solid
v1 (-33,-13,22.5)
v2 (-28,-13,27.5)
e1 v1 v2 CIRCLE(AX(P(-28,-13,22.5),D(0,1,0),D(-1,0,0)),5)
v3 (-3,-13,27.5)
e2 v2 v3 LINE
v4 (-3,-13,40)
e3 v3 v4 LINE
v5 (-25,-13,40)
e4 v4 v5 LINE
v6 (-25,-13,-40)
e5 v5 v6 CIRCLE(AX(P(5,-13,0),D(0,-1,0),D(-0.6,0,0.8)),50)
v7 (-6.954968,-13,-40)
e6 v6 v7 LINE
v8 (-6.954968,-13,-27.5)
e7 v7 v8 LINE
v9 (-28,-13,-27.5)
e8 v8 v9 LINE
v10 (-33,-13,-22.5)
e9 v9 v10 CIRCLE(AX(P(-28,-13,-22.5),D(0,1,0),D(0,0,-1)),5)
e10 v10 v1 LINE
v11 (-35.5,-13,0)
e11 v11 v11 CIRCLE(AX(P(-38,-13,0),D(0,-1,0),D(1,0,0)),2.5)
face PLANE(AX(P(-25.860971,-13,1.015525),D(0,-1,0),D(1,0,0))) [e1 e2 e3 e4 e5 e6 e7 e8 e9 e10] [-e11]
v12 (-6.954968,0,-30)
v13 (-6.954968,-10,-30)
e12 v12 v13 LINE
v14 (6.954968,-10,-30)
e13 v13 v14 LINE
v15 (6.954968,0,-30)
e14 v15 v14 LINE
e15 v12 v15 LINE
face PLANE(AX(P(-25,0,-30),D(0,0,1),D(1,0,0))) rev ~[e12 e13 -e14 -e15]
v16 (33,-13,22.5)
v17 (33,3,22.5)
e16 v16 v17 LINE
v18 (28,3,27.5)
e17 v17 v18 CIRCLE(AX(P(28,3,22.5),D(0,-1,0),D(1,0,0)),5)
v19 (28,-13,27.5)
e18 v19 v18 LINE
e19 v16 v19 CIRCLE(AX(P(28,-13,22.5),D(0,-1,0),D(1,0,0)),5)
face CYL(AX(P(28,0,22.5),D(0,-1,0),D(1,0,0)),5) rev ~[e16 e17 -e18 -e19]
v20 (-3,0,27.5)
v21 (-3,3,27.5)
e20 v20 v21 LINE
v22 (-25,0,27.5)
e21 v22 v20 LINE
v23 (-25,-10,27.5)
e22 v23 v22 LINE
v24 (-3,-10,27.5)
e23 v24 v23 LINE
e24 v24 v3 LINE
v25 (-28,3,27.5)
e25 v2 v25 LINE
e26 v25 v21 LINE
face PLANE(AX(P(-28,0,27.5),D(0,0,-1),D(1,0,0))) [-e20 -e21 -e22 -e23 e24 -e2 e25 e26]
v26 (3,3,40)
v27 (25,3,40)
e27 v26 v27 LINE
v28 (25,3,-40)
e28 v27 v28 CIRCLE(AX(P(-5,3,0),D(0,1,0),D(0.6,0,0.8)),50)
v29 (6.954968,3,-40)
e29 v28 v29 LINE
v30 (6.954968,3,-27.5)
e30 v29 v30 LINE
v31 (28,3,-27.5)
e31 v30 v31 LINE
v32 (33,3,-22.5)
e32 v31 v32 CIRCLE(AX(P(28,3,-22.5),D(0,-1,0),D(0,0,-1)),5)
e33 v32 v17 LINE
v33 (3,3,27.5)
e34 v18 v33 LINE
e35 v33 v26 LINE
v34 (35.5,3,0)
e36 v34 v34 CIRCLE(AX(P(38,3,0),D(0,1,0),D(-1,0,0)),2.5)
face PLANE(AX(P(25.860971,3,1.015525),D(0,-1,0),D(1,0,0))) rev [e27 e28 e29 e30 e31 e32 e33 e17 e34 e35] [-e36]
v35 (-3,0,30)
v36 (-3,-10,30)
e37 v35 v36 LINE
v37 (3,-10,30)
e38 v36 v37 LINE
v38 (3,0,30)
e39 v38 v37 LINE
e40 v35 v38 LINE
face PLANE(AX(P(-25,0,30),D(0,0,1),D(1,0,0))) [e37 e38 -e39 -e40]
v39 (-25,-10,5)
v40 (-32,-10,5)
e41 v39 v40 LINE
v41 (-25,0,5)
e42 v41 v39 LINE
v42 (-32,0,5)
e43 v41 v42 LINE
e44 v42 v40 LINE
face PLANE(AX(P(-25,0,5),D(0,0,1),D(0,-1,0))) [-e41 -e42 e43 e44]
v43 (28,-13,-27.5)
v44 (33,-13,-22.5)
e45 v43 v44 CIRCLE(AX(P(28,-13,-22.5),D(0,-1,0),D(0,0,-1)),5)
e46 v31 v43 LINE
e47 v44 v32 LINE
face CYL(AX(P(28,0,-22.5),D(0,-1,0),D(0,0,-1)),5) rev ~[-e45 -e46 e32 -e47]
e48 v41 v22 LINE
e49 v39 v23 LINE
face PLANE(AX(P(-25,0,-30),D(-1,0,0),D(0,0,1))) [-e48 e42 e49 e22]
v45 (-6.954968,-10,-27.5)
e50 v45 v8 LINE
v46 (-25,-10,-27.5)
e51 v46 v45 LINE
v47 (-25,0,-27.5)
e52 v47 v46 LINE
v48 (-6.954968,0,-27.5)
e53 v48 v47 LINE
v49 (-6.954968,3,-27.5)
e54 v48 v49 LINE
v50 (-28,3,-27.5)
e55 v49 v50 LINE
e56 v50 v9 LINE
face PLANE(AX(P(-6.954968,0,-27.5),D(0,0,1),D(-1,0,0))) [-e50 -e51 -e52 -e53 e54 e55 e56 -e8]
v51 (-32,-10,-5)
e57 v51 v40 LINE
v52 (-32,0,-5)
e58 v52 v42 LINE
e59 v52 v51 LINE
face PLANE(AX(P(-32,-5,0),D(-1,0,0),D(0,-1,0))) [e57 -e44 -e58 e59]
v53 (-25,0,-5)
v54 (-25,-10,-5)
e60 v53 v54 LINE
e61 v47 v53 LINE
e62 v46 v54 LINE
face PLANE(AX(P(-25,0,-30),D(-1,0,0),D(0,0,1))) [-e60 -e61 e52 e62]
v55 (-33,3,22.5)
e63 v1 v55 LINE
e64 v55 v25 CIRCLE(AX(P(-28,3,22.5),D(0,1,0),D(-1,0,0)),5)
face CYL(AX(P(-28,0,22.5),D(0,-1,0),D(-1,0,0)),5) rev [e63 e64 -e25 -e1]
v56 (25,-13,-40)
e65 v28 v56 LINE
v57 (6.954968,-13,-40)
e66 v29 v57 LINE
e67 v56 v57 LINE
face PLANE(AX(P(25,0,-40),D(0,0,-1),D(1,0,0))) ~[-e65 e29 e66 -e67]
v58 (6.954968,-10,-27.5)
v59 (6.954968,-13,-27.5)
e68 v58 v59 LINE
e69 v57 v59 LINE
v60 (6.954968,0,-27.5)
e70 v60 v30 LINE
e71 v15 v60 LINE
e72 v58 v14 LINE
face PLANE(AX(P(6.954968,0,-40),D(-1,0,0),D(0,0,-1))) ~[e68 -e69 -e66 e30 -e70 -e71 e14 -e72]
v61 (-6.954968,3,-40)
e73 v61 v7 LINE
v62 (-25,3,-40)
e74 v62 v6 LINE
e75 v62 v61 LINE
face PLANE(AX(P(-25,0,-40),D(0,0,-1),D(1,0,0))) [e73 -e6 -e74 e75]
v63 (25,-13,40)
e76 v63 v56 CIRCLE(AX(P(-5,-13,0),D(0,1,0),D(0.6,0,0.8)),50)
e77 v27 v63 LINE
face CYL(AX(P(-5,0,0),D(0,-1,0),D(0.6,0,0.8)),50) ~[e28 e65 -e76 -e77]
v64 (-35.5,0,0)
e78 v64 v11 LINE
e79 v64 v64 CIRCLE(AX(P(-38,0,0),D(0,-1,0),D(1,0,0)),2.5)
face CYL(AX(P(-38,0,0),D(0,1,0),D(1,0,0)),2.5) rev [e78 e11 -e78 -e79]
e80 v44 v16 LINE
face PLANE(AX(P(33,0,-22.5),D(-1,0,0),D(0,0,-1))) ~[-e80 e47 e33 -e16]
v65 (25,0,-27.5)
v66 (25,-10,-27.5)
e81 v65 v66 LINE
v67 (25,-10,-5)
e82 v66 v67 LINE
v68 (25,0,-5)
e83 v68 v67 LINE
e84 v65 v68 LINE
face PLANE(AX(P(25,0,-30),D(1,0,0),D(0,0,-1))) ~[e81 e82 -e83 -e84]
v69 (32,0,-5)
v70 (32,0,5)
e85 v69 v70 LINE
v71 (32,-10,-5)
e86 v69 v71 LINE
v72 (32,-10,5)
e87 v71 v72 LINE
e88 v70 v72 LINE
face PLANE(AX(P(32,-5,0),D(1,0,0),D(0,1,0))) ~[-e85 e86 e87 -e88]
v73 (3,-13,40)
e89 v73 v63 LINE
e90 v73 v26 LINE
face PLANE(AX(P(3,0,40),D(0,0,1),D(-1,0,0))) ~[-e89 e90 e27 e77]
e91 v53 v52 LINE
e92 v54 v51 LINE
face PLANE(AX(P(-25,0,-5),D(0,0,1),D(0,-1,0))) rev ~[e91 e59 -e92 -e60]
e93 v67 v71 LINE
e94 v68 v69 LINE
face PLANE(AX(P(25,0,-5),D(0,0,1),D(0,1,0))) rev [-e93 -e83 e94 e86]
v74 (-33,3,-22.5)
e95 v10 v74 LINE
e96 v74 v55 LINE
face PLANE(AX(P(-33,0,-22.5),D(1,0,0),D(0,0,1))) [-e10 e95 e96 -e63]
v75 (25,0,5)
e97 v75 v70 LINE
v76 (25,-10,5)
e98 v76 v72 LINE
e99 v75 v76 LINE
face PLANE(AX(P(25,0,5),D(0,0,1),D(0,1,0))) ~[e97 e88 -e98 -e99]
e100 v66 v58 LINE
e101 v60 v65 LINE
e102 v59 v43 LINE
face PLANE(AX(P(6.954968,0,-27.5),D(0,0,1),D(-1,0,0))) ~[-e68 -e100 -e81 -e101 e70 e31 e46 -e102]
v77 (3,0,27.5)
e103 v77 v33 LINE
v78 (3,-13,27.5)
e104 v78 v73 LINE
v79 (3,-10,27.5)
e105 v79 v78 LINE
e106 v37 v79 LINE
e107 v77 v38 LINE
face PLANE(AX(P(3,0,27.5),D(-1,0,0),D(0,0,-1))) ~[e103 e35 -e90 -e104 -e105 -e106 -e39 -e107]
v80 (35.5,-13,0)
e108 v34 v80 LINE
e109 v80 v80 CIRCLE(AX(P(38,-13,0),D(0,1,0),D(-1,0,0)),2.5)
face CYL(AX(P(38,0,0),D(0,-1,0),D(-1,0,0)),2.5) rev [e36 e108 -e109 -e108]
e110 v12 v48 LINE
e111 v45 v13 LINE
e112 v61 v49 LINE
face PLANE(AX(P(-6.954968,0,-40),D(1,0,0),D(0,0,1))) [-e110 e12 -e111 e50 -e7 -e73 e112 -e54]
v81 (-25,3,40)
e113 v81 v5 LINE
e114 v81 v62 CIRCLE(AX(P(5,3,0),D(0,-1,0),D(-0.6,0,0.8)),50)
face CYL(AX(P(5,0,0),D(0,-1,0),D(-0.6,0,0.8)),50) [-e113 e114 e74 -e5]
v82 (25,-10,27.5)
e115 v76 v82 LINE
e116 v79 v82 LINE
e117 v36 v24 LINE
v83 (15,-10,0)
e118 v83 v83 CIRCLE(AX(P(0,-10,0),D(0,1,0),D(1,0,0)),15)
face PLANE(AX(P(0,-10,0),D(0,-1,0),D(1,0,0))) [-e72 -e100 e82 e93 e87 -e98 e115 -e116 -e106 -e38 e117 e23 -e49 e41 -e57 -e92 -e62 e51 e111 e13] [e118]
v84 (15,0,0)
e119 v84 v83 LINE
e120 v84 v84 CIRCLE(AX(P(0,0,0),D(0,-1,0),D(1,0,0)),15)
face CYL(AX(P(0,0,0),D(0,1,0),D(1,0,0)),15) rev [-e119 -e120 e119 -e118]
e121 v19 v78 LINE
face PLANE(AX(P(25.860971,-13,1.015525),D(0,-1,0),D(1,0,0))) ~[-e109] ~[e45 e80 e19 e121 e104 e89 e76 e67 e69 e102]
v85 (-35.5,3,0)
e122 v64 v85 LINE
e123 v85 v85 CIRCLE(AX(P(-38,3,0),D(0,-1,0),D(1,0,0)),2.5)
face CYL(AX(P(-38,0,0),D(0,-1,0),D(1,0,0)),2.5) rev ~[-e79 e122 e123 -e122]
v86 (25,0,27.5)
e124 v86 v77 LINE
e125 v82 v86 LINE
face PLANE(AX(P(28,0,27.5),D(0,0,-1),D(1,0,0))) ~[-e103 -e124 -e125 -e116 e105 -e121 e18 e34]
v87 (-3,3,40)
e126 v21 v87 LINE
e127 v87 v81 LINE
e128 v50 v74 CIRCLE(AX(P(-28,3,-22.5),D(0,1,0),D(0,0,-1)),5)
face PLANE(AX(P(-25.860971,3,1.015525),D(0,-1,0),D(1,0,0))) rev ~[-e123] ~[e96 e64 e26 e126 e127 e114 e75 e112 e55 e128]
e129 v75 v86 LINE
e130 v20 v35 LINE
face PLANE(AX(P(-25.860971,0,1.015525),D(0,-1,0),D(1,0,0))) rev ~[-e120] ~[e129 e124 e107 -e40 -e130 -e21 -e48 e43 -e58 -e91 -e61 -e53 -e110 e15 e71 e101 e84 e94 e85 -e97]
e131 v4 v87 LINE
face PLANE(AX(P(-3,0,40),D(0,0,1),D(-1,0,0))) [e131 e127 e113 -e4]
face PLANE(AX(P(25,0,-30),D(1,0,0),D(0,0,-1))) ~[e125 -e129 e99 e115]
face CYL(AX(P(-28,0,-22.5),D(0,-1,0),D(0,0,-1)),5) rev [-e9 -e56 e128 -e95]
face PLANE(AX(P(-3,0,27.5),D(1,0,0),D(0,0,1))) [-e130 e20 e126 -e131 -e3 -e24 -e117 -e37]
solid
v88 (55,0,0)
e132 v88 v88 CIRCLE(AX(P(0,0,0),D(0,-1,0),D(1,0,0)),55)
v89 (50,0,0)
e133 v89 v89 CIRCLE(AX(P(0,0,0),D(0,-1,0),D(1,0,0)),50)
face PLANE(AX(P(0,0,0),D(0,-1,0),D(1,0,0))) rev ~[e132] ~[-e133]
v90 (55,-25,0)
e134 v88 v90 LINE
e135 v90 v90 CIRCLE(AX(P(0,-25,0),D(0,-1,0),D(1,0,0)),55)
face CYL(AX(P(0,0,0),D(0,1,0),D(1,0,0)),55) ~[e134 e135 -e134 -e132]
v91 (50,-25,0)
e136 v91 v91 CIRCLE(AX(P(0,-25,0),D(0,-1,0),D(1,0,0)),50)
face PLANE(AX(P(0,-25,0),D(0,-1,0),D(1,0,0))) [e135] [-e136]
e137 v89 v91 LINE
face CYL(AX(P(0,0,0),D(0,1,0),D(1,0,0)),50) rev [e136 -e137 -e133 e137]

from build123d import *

# Parameters (mm, degrees)
F0_W          = 50
F0_H          = 60
F0_R          = 15
F1_DEPTH      = 10
F2_R          = 2.5
F3_DEPTH      = 13
F3_DEPTH_BACK = 3
F4_W          = 10
F4_H          = 10
F5_DEPTH      = 7
F7_R          = 55
F7_R_2        = 50
F8_DEPTH      = 25


# Not quite as in the source:
# - a feature names something its author has since deleted; it is built from what else it names


with BuildPart() as f1:
    # F0 (on Front) → F1 (new body)
    with BuildSketch(Plane.XZ):
        Rectangle(F0_W, F0_H)
        Circle(F0_R, mode=Mode.SUBTRACT)
    extrude(amount=F1_DEPTH)

    # F2 (on Front) → F3 (join, two sides)
    with BuildSketch(Plane.XZ) as f3_sk:
        with BuildLine():
            Line((-3, 40), (-25, 40))
            ThreePointArc((-25, 40), (-45, 0), (-25, -40))
            Line((-25, -40), (-6.9549679495, -40))
            Line((-6.9549679495, -40), (-6.9549679495, -27.5))
            Line((-6.9549679495, -27.5), (-28, -27.5))
            ThreePointArc((-28, -27.5), (-31.5355339059, -26.0355339059), (-33, -22.5))
            Line((-33, -22.5), (-33, 22.5))
            ThreePointArc((-33, 22.5), (-31.5355339059, 26.0355339059), (-28, 27.5))
            Line((-28, 27.5), (-3, 27.5))
            Line((-3, 27.5), (-3, 40))
        make_face()
        with Locations((-38, 0)):
            Circle(F2_R, mode=Mode.SUBTRACT)
    extrude(amount=F3_DEPTH)
    extrude(f3_sk.sketch, amount=-F3_DEPTH_BACK)

    # F4 (on face) → F5 (join)
    with BuildSketch(Plane(origin=(-25, 0, 0), x_dir=(0, -1, 0), z_dir=(-1, 0, 0))):
        with Locations((5, 0)):
            Rectangle(F4_W, F4_H)
    extrude(amount=F5_DEPTH)

    # F6: F1 across plane


with BuildPart() as f1_1:
    add(f1.part)
    add(f1.part.mirror(Plane.YZ))


with BuildPart() as f8:
    # F7 (on Front) → F8 (new body)
    with BuildSketch(Plane.XZ):
        Circle(F7_R)
        Circle(F7_R_2, mode=Mode.SUBTRACT)
    extrude(amount=F8_DEPTH)


solid = Compound([f1_1.part, f8.part])
